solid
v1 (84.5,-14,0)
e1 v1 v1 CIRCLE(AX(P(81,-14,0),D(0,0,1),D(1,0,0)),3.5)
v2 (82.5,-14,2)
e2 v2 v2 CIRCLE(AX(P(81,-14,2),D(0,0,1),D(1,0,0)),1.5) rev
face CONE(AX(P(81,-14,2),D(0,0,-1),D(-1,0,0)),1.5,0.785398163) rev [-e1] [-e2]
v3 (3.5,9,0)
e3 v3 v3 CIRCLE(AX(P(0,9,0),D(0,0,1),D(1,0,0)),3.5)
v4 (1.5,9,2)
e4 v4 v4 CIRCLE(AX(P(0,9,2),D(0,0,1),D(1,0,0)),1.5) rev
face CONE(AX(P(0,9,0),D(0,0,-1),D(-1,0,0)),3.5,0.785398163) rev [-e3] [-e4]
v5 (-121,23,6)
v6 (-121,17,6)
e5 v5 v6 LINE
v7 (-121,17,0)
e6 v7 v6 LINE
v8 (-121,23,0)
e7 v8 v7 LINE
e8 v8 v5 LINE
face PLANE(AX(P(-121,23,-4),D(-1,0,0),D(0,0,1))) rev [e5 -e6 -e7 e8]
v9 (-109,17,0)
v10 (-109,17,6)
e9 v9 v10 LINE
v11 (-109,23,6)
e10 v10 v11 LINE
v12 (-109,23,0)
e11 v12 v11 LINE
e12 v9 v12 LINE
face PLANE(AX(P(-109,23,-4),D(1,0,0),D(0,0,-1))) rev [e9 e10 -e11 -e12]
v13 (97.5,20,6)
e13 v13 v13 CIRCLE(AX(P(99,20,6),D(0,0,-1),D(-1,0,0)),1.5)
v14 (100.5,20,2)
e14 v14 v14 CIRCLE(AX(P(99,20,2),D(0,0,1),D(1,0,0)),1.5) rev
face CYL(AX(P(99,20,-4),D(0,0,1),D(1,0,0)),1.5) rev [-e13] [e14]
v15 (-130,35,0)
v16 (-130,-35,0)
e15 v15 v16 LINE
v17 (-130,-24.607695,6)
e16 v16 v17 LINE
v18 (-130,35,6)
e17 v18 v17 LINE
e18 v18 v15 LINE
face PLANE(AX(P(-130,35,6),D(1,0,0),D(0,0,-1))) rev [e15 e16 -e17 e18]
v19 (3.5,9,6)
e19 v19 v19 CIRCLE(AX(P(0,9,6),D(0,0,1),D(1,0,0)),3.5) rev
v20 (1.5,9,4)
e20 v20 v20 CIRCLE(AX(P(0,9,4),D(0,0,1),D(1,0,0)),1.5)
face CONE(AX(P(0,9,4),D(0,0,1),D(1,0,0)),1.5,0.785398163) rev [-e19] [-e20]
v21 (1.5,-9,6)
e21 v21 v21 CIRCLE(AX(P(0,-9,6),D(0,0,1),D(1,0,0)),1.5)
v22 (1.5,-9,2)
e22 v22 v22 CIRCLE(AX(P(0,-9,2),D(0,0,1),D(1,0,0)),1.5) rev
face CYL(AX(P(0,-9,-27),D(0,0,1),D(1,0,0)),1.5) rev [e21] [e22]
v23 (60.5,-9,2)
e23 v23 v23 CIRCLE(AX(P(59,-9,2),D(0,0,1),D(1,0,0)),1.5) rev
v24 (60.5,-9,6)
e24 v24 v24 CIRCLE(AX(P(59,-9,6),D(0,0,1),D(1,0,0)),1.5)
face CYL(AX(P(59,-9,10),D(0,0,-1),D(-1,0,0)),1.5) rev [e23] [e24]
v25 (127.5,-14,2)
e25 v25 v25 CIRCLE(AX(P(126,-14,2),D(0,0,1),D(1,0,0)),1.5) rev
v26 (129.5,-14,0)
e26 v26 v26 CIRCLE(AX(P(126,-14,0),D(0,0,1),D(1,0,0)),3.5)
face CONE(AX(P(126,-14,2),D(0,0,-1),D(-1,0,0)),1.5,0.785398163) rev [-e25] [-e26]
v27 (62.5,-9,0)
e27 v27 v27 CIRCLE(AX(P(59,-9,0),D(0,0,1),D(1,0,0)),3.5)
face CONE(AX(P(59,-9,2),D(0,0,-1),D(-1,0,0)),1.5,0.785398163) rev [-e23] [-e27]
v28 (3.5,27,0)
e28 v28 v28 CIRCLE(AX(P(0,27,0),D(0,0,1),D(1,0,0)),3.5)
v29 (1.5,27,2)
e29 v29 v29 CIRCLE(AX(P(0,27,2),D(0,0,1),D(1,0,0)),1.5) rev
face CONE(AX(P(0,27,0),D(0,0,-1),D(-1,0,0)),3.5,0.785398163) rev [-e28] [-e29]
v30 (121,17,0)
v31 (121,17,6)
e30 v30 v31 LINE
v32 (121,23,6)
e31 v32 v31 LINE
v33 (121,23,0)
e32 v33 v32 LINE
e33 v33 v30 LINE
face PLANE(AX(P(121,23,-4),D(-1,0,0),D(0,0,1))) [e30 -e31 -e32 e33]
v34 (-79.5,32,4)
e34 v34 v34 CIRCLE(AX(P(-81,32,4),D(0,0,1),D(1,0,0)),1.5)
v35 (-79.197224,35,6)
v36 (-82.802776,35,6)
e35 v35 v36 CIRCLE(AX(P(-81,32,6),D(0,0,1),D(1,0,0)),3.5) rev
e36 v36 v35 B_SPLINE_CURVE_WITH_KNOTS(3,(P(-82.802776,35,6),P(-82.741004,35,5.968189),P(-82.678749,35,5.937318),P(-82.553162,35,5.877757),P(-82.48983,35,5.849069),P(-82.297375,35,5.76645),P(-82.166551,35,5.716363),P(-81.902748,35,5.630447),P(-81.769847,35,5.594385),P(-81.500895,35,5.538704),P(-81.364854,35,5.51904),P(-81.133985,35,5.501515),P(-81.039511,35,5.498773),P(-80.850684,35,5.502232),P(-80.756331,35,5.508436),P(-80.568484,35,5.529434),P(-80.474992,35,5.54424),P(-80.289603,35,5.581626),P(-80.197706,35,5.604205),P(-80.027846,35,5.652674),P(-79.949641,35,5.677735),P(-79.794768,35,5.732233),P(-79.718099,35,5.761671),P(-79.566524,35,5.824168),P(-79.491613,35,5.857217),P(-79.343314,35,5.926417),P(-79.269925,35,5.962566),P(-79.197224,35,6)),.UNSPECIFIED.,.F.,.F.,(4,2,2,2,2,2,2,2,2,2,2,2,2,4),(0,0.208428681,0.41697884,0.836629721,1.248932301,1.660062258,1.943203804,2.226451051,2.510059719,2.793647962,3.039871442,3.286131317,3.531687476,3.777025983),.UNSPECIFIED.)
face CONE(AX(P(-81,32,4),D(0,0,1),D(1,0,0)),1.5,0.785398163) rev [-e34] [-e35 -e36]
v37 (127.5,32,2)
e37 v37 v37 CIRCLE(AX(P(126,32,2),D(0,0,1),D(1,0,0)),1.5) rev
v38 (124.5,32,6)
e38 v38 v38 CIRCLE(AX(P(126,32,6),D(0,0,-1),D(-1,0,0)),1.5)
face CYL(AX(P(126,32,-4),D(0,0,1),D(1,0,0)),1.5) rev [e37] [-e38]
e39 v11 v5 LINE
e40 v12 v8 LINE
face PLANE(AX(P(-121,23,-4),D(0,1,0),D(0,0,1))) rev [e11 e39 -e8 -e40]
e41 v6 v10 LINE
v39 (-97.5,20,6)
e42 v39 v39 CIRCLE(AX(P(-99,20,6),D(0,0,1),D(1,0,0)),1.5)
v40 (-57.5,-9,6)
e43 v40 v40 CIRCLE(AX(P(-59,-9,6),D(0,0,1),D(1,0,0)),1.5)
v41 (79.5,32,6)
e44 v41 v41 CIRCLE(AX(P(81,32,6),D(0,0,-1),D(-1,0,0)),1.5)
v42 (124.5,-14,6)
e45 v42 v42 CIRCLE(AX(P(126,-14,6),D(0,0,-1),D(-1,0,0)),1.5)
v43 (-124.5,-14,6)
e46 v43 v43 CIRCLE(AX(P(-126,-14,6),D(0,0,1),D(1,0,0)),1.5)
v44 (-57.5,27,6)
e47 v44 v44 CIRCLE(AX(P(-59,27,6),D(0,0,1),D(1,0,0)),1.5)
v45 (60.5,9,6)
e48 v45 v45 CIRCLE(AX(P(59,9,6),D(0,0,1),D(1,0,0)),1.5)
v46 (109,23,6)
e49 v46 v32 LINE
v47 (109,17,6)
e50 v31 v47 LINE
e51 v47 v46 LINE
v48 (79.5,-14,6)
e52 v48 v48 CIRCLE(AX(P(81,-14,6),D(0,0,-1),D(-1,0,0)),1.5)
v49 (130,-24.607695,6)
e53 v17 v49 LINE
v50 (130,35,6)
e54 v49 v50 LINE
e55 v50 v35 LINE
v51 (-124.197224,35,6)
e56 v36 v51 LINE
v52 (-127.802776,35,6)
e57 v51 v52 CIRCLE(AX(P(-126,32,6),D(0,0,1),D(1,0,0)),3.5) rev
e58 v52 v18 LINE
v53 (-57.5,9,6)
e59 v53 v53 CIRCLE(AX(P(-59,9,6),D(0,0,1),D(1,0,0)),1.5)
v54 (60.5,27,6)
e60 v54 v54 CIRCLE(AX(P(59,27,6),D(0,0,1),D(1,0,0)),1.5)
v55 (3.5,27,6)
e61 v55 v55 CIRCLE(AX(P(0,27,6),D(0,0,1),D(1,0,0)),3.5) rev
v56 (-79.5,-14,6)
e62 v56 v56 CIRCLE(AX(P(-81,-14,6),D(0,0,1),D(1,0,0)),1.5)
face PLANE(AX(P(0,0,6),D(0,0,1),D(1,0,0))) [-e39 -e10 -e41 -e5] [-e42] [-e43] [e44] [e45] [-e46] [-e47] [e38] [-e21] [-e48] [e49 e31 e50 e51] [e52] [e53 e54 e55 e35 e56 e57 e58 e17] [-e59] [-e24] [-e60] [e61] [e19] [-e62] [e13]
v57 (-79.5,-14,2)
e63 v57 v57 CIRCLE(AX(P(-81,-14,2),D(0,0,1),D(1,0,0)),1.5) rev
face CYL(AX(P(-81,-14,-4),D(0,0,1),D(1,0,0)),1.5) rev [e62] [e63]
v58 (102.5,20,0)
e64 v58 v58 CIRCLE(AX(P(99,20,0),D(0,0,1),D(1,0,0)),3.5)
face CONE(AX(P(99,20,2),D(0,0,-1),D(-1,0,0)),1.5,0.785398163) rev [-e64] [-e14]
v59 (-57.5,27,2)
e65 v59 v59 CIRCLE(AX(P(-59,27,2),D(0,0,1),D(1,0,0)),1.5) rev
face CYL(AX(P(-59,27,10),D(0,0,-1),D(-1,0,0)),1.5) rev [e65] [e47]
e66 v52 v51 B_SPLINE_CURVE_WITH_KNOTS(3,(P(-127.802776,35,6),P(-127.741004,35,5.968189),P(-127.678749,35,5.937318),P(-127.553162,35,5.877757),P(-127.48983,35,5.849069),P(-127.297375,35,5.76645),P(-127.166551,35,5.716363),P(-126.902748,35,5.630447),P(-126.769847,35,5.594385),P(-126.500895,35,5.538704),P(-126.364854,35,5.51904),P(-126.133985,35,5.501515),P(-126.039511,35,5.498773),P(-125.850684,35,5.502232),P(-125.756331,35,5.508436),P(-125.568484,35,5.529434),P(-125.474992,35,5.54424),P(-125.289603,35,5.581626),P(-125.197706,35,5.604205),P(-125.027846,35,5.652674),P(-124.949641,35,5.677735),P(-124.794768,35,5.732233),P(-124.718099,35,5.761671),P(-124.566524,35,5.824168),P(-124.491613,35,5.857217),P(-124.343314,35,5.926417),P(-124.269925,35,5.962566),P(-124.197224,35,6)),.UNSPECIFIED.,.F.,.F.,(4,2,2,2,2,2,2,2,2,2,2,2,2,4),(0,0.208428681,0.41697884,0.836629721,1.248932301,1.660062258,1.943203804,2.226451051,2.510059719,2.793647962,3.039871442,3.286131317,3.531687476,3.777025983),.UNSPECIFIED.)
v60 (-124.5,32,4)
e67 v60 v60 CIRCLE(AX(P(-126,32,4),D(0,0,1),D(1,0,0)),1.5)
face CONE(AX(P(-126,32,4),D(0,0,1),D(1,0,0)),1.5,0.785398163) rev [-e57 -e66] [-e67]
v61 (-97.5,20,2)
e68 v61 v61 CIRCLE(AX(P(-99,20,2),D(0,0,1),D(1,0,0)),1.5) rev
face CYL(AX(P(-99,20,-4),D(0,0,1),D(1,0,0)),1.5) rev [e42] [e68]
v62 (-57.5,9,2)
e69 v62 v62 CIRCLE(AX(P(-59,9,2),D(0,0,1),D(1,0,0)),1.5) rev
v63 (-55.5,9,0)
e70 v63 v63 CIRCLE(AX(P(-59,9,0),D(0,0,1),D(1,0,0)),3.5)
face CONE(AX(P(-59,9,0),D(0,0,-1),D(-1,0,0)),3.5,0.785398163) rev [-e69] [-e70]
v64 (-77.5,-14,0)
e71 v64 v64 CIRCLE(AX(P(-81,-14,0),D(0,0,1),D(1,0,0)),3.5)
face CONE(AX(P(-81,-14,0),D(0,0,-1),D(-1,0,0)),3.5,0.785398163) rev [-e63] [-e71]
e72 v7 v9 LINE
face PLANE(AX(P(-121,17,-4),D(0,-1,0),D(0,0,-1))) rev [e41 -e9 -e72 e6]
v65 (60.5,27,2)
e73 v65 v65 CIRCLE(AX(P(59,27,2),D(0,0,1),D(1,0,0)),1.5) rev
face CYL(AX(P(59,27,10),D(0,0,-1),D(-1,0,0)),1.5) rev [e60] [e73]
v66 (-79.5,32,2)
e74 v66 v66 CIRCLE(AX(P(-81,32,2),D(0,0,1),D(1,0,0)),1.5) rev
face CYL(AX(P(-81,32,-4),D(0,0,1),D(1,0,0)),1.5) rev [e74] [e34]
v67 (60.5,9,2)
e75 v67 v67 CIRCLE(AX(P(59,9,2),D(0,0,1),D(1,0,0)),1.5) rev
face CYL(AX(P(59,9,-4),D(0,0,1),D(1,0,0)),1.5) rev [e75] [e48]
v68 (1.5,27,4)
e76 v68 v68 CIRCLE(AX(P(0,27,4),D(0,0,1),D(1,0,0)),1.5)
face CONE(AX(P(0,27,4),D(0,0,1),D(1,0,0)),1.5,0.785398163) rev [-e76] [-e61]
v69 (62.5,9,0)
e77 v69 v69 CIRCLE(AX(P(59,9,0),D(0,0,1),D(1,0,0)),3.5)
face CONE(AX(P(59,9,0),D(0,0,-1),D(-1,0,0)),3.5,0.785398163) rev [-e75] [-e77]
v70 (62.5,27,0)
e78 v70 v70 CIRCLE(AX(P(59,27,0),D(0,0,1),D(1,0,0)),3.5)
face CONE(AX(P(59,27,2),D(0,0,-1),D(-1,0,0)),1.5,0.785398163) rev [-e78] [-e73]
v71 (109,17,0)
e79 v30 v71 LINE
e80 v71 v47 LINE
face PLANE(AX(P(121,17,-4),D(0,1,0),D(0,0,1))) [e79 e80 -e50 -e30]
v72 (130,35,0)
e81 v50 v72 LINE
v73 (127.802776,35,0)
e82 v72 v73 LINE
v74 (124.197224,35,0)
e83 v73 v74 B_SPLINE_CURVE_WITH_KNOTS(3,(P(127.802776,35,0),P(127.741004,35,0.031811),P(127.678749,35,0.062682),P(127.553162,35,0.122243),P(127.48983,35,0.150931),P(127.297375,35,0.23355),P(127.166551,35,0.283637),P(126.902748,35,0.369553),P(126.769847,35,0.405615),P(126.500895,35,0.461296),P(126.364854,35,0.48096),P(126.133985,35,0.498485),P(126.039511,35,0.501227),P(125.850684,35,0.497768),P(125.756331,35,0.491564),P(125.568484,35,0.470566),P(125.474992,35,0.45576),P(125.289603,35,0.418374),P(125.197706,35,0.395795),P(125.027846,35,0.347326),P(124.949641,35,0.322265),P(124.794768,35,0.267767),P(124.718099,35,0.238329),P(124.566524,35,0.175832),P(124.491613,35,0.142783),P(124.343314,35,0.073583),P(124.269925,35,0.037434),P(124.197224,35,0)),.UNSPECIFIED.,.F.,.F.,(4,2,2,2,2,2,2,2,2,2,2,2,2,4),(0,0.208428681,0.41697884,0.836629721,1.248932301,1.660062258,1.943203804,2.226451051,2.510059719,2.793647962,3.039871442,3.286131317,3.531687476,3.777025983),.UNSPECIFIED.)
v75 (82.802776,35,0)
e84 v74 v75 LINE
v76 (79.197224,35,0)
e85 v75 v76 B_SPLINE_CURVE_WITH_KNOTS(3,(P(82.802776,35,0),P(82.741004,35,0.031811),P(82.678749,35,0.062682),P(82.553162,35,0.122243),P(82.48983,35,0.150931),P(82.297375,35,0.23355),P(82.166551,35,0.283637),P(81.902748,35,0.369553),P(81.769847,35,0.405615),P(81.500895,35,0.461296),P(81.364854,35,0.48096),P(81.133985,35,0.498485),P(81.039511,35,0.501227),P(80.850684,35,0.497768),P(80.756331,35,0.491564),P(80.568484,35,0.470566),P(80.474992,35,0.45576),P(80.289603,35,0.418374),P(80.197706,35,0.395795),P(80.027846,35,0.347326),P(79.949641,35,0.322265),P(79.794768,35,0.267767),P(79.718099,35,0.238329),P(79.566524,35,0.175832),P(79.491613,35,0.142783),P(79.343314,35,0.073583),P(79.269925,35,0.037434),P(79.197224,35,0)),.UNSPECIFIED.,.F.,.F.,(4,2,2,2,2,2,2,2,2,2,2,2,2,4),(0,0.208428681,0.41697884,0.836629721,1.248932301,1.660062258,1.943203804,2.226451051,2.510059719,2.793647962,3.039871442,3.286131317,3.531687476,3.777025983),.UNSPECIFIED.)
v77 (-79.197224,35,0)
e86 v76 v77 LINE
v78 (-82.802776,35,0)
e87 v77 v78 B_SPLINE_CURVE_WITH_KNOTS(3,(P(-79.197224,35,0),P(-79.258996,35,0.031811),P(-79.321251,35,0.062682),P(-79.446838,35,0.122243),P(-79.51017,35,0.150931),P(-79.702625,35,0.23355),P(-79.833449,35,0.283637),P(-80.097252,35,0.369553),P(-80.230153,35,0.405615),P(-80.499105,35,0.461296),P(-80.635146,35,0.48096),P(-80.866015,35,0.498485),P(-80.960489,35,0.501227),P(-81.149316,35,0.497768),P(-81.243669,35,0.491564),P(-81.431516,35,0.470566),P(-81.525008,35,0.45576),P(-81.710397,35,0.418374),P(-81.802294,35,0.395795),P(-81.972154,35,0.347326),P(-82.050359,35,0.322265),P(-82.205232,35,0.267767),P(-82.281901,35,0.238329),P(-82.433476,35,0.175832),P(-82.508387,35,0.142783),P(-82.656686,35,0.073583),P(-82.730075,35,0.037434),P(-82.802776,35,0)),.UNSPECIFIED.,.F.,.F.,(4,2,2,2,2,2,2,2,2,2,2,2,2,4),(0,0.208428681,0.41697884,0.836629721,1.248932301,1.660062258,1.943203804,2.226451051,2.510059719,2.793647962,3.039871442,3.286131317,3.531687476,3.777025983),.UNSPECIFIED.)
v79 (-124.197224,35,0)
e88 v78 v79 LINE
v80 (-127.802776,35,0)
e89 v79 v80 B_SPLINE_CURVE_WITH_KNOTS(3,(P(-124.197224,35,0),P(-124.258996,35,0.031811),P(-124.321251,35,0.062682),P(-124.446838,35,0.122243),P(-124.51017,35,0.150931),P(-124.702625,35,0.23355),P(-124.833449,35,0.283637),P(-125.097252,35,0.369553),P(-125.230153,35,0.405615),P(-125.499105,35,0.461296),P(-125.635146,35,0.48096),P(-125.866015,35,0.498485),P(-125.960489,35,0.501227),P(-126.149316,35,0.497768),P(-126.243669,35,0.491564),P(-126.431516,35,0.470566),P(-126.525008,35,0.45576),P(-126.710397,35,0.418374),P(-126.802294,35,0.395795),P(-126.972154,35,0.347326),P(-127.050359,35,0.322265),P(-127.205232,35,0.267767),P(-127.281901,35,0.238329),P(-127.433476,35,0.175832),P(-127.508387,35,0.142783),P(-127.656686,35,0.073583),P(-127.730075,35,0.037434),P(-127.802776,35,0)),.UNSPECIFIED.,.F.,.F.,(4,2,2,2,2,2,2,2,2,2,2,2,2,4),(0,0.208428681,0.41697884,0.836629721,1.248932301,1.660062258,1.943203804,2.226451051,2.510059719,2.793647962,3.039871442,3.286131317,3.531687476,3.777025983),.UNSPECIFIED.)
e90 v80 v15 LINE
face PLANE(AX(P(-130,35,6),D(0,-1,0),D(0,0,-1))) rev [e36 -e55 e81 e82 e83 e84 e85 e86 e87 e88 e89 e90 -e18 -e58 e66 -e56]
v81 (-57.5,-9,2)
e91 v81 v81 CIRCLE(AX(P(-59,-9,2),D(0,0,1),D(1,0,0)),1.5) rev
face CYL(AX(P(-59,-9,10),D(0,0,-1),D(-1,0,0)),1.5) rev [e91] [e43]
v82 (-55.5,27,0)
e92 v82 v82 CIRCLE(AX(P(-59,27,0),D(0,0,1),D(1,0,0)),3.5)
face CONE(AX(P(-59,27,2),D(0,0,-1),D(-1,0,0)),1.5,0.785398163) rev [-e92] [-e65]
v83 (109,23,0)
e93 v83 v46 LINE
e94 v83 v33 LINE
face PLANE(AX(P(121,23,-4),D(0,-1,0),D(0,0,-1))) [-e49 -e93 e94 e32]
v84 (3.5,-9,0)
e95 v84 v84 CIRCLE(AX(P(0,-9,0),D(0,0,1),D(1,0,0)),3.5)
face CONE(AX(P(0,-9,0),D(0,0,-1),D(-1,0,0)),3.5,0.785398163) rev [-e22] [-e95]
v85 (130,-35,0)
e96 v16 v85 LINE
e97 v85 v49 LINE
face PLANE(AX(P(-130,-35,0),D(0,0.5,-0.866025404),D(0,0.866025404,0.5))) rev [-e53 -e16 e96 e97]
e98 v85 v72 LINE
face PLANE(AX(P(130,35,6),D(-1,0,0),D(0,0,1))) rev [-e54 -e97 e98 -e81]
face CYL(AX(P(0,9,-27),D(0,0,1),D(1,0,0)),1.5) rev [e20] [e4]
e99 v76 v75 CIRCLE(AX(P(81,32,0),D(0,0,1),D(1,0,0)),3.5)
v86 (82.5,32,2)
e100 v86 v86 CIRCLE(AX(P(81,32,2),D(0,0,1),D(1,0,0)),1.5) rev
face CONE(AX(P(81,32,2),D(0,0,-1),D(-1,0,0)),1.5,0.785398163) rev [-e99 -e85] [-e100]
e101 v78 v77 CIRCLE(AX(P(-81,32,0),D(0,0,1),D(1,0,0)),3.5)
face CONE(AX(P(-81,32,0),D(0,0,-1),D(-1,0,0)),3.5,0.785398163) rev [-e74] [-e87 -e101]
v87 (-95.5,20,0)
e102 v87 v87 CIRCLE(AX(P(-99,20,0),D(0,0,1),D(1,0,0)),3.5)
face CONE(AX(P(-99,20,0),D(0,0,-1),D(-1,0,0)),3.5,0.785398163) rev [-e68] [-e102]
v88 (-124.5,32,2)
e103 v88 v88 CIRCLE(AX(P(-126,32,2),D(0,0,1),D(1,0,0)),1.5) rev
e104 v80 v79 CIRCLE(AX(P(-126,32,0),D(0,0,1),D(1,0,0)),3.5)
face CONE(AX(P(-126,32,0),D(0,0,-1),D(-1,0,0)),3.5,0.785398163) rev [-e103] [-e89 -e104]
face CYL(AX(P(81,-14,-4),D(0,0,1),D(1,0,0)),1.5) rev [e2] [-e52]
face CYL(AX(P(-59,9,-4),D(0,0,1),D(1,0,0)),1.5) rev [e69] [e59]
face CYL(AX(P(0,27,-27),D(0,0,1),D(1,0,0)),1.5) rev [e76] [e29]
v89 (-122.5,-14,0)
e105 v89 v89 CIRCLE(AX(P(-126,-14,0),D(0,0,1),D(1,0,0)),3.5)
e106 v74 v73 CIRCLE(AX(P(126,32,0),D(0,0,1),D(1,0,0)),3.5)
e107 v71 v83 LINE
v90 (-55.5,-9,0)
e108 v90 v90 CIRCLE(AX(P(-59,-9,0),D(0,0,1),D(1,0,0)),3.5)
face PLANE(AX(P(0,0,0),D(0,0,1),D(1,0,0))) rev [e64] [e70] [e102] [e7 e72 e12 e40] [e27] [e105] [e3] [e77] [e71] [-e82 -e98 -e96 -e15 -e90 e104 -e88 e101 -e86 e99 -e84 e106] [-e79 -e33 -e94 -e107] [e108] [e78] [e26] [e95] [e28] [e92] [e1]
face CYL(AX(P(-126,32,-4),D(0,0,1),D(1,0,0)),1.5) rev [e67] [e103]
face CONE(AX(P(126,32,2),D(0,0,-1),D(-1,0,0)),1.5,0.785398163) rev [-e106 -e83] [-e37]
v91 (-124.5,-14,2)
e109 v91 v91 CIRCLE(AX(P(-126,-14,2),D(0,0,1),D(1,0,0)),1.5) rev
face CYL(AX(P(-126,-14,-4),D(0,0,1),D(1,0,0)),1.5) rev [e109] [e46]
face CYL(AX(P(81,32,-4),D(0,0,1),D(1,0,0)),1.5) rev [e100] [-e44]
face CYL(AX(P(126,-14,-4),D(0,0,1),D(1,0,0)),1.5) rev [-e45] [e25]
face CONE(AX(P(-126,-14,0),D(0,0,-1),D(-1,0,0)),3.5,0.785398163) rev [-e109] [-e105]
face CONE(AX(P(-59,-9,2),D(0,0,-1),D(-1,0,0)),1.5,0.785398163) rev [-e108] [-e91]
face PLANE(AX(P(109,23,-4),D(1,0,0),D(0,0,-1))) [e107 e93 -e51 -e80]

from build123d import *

# Parameters (mm, degrees)
SKETCH_1_W          = 260
SKETCH_1_H          = 70
EXTRUDE_1_DEPTH     = 6
CUT_EXTRUDE_1_DEPTH = 260
SKETCH_3_R          = 1.5
CUT_EXTRUDE_2_DEPTH = 10
SKETCH_4_R          = 1.5
CUT_EXTRUDE_3_DEPTH = 10
SKETCH_5_R          = 1.5
CUT_EXTRUDE_4_DEPTH = 33
SKETCH_6_R          = 1.5
SKETCH_6_W          = 12
SKETCH_6_H          = 6
CUT_EXTRUDE_5_DEPTH = 10
SKETCH_7_R          = 1.5
CUT_EXTRUDE_6_DEPTH = 10
CHAMFER_1_SIZE      = 2
CHAMFER_2_SIZE      = 2
CHAMFER_3_SIZE      = 2
CHAMFER_4_SIZE      = 2


with BuildPart() as part:
    # 草图1 → 凸台-拉伸1 (new body)
    with BuildSketch(Plane.XY):
        Rectangle(SKETCH_1_W, SKETCH_1_H)
    extrude(amount=EXTRUDE_1_DEPTH)

    # 草图2 → 切除-拉伸1 (cut)
    with BuildSketch(Plane(origin=(130, 0, 0), x_dir=(0, 0, -1), z_dir=(1, 0, 0))):
        Polygon((0, -35), (-6, -24.607695155), (-6, -35), align=None)
    extrude(amount=-CUT_EXTRUDE_1_DEPTH, mode=Mode.SUBTRACT)

    # 草图3 → 切除-拉伸2 (cut)
    with BuildSketch(Plane.XY.offset(6)):
        with Locations((-59, 9)):
            Circle(SKETCH_3_R)
        with Locations((59, 9)):
            Circle(SKETCH_3_R)
    extrude(amount=-CUT_EXTRUDE_2_DEPTH, mode=Mode.SUBTRACT)

    # 草图4 → 切除-拉伸3 (cut)
    with BuildSketch(Plane(origin=(0, 0, 0), x_dir=(-1, 0, 0), z_dir=(0, 0, -1))):
        with Locations((-59, 27)):
            Circle(SKETCH_4_R)
        with Locations((-59, -9)):
            Circle(SKETCH_4_R)
        with Locations((59, 27)):
            Circle(SKETCH_4_R)
        with Locations((59, -9)):
            Circle(SKETCH_4_R)
    extrude(amount=-CUT_EXTRUDE_3_DEPTH, mode=Mode.SUBTRACT)

    # 草图5 → 切除-拉伸4 (cut)
    with BuildSketch(Plane.XY.offset(6)):
        with Locations((0, 27)):
            Circle(SKETCH_5_R)
        with Locations((0, 9)):
            Circle(SKETCH_5_R)
        with Locations((0, -9)):
            Circle(SKETCH_5_R)
    extrude(amount=-CUT_EXTRUDE_4_DEPTH, mode=Mode.SUBTRACT)

    # 草图6 → 切除-拉伸5 (cut)
    with BuildSketch(Plane.XY.offset(6)):
        with Locations((-99, 20)):
            Circle(SKETCH_6_R)
        with Locations((-115, 20)):
            Rectangle(SKETCH_6_W, SKETCH_6_H)
    cut_extrude_5 = extrude(amount=-CUT_EXTRUDE_5_DEPTH, mode=Mode.SUBTRACT)

    # 镜向1: 切除-拉伸5 across plane
    add(cut_extrude_5.mirror(Plane(origin=(0, 0, 0), x_dir=(0, 0, 1), z_dir=(1, 0, 0))), mode=Mode.SUBTRACT)

    # 草图7 → 切除-拉伸6 (cut)
    with BuildSketch(Plane.XY.offset(6)):
        with Locations((-126, 32)):
            Circle(SKETCH_7_R)
        with Locations((-81, 32)):
            Circle(SKETCH_7_R)
        with Locations((-81, -14)):
            Circle(SKETCH_7_R)
        with Locations((-126, -14)):
            Circle(SKETCH_7_R)
    cut_extrude_6 = extrude(amount=-CUT_EXTRUDE_6_DEPTH, mode=Mode.SUBTRACT)

    # 镜向2: 切除-拉伸6 across plane
    add(cut_extrude_6.mirror(Plane(origin=(0, 0, 0), x_dir=(0, 0, 1), z_dir=(1, 0, 0))), mode=Mode.SUBTRACT)

    # 倒角1
    # the kernel refuses this chamfer: 2 mm, written as the material it takes off along each edge
    with BuildSketch(Plane(origin=(126, 32, 0), x_dir=(-1, 0, 0), z_dir=(0, 1, 0))) as chamfer_1_piece_1:
        Polygon((1.5 + CHAMFER_1_SIZE, 0), (1.5, CHAMFER_1_SIZE), (1.5, 0), align=None)
    revolve(axis=Axis((126, 32, 0), (0, 0, 1)), mode=Mode.SUBTRACT)

    # 倒角2
    # the kernel refuses this chamfer: 2 mm, written as the material it takes off along each edge
    with BuildSketch(Plane(origin=(-126, 32, 0), x_dir=(1, 0, 0), z_dir=(0, -1, 0))) as chamfer_2_piece_1:
        Polygon((1.5 + CHAMFER_2_SIZE, 0), (1.5, CHAMFER_2_SIZE), (1.5, 0), align=None)
    revolve(axis=Axis((-126, 32, 0), (0, 0, 1)), mode=Mode.SUBTRACT)
    with BuildSketch(Plane(origin=(-126, 32, 6), x_dir=(1, 0, 0), z_dir=(0, -1, 0))) as chamfer_2_piece_2:
        Polygon((1.5 + CHAMFER_2_SIZE, 0), (1.5, -CHAMFER_2_SIZE), (1.5, 0), align=None)
    revolve(axis=Axis((-126, 32, 6), (0, 0, 1)), mode=Mode.SUBTRACT)
    with BuildSketch(Plane(origin=(-81, 32, 0), x_dir=(1, 0, 0), z_dir=(0, -1, 0))) as chamfer_2_piece_3:
        Polygon((1.5 + CHAMFER_2_SIZE, 0), (1.5, CHAMFER_2_SIZE), (1.5, 0), align=None)
    revolve(axis=Axis((-81, 32, 0), (0, 0, 1)), mode=Mode.SUBTRACT)
    with BuildSketch(Plane(origin=(-81, 32, 6), x_dir=(1, 0, 0), z_dir=(0, -1, 0))) as chamfer_2_piece_4:
        Polygon((1.5 + CHAMFER_2_SIZE, 0), (1.5, -CHAMFER_2_SIZE), (1.5, 0), align=None)
    revolve(axis=Axis((-81, 32, 6), (0, 0, 1)), mode=Mode.SUBTRACT)
    with BuildSketch(Plane(origin=(81, 32, 0), x_dir=(-1, 0, 0), z_dir=(0, 1, 0))) as chamfer_2_piece_5:
        Polygon((1.5 + CHAMFER_2_SIZE, 0), (1.5, CHAMFER_2_SIZE), (1.5, 0), align=None)
    revolve(axis=Axis((81, 32, 0), (0, 0, 1)), mode=Mode.SUBTRACT)
    with BuildSketch(Plane(origin=(59, 27, 0), x_dir=(-1, 0, 0), z_dir=(0, -1, 0))) as chamfer_2_piece_6:
        Polygon((1.5 + CHAMFER_2_SIZE, 0), (1.5, -CHAMFER_2_SIZE), (1.5, 0), align=None)
    revolve(axis=Axis((59, 27, 0), (0, 0, -1)), mode=Mode.SUBTRACT)
    with BuildSketch(Plane(origin=(-59, 27, 0), x_dir=(-1, 0, 0), z_dir=(0, -1, 0))) as chamfer_2_piece_7:
        Polygon((1.5 + CHAMFER_2_SIZE, 0), (1.5, -CHAMFER_2_SIZE), (1.5, 0), align=None)
    revolve(axis=Axis((-59, 27, 0), (0, 0, -1)), mode=Mode.SUBTRACT)
    with BuildSketch(Plane(origin=(0, 27, 6), x_dir=(1, 0, 0), z_dir=(0, -1, 0))) as chamfer_2_piece_8:
        Polygon((1.5 + CHAMFER_2_SIZE, 0), (1.5, -CHAMFER_2_SIZE), (1.5, 0), align=None)
    revolve(axis=Axis((0, 27, 6), (0, 0, 1)), mode=Mode.SUBTRACT)

    # 倒角3
    chamfer_3_edges = [part.edges().sort_by_distance(p)[0] for p in [
        (-82.5, -14, 0),
        (-127.5, -14, 0),
        (-60.5, 9, 0),
        (57.5, 9, 0),
        (-57.5, -9, 0),
        (-1.5, 27, 0),
        (-1.5, 9, 0),
        (-1.5, 9, 6),
        (-1.5, -9, 0),
        (-100.5, 20, 0),
        (100.5, 20, 0),
    ]]
    chamfer(chamfer_3_edges, length=CHAMFER_3_SIZE)

    # 倒角4
    chamfer_4_edges = [part.edges().sort_by_distance(p)[0] for p in [
        (82.5, -14, 0),
        (127.5, -14, 0),
        (60.5, -9, 0),
    ]]
    chamfer(chamfer_4_edges, length=CHAMFER_4_SIZE)


solid = part.part
